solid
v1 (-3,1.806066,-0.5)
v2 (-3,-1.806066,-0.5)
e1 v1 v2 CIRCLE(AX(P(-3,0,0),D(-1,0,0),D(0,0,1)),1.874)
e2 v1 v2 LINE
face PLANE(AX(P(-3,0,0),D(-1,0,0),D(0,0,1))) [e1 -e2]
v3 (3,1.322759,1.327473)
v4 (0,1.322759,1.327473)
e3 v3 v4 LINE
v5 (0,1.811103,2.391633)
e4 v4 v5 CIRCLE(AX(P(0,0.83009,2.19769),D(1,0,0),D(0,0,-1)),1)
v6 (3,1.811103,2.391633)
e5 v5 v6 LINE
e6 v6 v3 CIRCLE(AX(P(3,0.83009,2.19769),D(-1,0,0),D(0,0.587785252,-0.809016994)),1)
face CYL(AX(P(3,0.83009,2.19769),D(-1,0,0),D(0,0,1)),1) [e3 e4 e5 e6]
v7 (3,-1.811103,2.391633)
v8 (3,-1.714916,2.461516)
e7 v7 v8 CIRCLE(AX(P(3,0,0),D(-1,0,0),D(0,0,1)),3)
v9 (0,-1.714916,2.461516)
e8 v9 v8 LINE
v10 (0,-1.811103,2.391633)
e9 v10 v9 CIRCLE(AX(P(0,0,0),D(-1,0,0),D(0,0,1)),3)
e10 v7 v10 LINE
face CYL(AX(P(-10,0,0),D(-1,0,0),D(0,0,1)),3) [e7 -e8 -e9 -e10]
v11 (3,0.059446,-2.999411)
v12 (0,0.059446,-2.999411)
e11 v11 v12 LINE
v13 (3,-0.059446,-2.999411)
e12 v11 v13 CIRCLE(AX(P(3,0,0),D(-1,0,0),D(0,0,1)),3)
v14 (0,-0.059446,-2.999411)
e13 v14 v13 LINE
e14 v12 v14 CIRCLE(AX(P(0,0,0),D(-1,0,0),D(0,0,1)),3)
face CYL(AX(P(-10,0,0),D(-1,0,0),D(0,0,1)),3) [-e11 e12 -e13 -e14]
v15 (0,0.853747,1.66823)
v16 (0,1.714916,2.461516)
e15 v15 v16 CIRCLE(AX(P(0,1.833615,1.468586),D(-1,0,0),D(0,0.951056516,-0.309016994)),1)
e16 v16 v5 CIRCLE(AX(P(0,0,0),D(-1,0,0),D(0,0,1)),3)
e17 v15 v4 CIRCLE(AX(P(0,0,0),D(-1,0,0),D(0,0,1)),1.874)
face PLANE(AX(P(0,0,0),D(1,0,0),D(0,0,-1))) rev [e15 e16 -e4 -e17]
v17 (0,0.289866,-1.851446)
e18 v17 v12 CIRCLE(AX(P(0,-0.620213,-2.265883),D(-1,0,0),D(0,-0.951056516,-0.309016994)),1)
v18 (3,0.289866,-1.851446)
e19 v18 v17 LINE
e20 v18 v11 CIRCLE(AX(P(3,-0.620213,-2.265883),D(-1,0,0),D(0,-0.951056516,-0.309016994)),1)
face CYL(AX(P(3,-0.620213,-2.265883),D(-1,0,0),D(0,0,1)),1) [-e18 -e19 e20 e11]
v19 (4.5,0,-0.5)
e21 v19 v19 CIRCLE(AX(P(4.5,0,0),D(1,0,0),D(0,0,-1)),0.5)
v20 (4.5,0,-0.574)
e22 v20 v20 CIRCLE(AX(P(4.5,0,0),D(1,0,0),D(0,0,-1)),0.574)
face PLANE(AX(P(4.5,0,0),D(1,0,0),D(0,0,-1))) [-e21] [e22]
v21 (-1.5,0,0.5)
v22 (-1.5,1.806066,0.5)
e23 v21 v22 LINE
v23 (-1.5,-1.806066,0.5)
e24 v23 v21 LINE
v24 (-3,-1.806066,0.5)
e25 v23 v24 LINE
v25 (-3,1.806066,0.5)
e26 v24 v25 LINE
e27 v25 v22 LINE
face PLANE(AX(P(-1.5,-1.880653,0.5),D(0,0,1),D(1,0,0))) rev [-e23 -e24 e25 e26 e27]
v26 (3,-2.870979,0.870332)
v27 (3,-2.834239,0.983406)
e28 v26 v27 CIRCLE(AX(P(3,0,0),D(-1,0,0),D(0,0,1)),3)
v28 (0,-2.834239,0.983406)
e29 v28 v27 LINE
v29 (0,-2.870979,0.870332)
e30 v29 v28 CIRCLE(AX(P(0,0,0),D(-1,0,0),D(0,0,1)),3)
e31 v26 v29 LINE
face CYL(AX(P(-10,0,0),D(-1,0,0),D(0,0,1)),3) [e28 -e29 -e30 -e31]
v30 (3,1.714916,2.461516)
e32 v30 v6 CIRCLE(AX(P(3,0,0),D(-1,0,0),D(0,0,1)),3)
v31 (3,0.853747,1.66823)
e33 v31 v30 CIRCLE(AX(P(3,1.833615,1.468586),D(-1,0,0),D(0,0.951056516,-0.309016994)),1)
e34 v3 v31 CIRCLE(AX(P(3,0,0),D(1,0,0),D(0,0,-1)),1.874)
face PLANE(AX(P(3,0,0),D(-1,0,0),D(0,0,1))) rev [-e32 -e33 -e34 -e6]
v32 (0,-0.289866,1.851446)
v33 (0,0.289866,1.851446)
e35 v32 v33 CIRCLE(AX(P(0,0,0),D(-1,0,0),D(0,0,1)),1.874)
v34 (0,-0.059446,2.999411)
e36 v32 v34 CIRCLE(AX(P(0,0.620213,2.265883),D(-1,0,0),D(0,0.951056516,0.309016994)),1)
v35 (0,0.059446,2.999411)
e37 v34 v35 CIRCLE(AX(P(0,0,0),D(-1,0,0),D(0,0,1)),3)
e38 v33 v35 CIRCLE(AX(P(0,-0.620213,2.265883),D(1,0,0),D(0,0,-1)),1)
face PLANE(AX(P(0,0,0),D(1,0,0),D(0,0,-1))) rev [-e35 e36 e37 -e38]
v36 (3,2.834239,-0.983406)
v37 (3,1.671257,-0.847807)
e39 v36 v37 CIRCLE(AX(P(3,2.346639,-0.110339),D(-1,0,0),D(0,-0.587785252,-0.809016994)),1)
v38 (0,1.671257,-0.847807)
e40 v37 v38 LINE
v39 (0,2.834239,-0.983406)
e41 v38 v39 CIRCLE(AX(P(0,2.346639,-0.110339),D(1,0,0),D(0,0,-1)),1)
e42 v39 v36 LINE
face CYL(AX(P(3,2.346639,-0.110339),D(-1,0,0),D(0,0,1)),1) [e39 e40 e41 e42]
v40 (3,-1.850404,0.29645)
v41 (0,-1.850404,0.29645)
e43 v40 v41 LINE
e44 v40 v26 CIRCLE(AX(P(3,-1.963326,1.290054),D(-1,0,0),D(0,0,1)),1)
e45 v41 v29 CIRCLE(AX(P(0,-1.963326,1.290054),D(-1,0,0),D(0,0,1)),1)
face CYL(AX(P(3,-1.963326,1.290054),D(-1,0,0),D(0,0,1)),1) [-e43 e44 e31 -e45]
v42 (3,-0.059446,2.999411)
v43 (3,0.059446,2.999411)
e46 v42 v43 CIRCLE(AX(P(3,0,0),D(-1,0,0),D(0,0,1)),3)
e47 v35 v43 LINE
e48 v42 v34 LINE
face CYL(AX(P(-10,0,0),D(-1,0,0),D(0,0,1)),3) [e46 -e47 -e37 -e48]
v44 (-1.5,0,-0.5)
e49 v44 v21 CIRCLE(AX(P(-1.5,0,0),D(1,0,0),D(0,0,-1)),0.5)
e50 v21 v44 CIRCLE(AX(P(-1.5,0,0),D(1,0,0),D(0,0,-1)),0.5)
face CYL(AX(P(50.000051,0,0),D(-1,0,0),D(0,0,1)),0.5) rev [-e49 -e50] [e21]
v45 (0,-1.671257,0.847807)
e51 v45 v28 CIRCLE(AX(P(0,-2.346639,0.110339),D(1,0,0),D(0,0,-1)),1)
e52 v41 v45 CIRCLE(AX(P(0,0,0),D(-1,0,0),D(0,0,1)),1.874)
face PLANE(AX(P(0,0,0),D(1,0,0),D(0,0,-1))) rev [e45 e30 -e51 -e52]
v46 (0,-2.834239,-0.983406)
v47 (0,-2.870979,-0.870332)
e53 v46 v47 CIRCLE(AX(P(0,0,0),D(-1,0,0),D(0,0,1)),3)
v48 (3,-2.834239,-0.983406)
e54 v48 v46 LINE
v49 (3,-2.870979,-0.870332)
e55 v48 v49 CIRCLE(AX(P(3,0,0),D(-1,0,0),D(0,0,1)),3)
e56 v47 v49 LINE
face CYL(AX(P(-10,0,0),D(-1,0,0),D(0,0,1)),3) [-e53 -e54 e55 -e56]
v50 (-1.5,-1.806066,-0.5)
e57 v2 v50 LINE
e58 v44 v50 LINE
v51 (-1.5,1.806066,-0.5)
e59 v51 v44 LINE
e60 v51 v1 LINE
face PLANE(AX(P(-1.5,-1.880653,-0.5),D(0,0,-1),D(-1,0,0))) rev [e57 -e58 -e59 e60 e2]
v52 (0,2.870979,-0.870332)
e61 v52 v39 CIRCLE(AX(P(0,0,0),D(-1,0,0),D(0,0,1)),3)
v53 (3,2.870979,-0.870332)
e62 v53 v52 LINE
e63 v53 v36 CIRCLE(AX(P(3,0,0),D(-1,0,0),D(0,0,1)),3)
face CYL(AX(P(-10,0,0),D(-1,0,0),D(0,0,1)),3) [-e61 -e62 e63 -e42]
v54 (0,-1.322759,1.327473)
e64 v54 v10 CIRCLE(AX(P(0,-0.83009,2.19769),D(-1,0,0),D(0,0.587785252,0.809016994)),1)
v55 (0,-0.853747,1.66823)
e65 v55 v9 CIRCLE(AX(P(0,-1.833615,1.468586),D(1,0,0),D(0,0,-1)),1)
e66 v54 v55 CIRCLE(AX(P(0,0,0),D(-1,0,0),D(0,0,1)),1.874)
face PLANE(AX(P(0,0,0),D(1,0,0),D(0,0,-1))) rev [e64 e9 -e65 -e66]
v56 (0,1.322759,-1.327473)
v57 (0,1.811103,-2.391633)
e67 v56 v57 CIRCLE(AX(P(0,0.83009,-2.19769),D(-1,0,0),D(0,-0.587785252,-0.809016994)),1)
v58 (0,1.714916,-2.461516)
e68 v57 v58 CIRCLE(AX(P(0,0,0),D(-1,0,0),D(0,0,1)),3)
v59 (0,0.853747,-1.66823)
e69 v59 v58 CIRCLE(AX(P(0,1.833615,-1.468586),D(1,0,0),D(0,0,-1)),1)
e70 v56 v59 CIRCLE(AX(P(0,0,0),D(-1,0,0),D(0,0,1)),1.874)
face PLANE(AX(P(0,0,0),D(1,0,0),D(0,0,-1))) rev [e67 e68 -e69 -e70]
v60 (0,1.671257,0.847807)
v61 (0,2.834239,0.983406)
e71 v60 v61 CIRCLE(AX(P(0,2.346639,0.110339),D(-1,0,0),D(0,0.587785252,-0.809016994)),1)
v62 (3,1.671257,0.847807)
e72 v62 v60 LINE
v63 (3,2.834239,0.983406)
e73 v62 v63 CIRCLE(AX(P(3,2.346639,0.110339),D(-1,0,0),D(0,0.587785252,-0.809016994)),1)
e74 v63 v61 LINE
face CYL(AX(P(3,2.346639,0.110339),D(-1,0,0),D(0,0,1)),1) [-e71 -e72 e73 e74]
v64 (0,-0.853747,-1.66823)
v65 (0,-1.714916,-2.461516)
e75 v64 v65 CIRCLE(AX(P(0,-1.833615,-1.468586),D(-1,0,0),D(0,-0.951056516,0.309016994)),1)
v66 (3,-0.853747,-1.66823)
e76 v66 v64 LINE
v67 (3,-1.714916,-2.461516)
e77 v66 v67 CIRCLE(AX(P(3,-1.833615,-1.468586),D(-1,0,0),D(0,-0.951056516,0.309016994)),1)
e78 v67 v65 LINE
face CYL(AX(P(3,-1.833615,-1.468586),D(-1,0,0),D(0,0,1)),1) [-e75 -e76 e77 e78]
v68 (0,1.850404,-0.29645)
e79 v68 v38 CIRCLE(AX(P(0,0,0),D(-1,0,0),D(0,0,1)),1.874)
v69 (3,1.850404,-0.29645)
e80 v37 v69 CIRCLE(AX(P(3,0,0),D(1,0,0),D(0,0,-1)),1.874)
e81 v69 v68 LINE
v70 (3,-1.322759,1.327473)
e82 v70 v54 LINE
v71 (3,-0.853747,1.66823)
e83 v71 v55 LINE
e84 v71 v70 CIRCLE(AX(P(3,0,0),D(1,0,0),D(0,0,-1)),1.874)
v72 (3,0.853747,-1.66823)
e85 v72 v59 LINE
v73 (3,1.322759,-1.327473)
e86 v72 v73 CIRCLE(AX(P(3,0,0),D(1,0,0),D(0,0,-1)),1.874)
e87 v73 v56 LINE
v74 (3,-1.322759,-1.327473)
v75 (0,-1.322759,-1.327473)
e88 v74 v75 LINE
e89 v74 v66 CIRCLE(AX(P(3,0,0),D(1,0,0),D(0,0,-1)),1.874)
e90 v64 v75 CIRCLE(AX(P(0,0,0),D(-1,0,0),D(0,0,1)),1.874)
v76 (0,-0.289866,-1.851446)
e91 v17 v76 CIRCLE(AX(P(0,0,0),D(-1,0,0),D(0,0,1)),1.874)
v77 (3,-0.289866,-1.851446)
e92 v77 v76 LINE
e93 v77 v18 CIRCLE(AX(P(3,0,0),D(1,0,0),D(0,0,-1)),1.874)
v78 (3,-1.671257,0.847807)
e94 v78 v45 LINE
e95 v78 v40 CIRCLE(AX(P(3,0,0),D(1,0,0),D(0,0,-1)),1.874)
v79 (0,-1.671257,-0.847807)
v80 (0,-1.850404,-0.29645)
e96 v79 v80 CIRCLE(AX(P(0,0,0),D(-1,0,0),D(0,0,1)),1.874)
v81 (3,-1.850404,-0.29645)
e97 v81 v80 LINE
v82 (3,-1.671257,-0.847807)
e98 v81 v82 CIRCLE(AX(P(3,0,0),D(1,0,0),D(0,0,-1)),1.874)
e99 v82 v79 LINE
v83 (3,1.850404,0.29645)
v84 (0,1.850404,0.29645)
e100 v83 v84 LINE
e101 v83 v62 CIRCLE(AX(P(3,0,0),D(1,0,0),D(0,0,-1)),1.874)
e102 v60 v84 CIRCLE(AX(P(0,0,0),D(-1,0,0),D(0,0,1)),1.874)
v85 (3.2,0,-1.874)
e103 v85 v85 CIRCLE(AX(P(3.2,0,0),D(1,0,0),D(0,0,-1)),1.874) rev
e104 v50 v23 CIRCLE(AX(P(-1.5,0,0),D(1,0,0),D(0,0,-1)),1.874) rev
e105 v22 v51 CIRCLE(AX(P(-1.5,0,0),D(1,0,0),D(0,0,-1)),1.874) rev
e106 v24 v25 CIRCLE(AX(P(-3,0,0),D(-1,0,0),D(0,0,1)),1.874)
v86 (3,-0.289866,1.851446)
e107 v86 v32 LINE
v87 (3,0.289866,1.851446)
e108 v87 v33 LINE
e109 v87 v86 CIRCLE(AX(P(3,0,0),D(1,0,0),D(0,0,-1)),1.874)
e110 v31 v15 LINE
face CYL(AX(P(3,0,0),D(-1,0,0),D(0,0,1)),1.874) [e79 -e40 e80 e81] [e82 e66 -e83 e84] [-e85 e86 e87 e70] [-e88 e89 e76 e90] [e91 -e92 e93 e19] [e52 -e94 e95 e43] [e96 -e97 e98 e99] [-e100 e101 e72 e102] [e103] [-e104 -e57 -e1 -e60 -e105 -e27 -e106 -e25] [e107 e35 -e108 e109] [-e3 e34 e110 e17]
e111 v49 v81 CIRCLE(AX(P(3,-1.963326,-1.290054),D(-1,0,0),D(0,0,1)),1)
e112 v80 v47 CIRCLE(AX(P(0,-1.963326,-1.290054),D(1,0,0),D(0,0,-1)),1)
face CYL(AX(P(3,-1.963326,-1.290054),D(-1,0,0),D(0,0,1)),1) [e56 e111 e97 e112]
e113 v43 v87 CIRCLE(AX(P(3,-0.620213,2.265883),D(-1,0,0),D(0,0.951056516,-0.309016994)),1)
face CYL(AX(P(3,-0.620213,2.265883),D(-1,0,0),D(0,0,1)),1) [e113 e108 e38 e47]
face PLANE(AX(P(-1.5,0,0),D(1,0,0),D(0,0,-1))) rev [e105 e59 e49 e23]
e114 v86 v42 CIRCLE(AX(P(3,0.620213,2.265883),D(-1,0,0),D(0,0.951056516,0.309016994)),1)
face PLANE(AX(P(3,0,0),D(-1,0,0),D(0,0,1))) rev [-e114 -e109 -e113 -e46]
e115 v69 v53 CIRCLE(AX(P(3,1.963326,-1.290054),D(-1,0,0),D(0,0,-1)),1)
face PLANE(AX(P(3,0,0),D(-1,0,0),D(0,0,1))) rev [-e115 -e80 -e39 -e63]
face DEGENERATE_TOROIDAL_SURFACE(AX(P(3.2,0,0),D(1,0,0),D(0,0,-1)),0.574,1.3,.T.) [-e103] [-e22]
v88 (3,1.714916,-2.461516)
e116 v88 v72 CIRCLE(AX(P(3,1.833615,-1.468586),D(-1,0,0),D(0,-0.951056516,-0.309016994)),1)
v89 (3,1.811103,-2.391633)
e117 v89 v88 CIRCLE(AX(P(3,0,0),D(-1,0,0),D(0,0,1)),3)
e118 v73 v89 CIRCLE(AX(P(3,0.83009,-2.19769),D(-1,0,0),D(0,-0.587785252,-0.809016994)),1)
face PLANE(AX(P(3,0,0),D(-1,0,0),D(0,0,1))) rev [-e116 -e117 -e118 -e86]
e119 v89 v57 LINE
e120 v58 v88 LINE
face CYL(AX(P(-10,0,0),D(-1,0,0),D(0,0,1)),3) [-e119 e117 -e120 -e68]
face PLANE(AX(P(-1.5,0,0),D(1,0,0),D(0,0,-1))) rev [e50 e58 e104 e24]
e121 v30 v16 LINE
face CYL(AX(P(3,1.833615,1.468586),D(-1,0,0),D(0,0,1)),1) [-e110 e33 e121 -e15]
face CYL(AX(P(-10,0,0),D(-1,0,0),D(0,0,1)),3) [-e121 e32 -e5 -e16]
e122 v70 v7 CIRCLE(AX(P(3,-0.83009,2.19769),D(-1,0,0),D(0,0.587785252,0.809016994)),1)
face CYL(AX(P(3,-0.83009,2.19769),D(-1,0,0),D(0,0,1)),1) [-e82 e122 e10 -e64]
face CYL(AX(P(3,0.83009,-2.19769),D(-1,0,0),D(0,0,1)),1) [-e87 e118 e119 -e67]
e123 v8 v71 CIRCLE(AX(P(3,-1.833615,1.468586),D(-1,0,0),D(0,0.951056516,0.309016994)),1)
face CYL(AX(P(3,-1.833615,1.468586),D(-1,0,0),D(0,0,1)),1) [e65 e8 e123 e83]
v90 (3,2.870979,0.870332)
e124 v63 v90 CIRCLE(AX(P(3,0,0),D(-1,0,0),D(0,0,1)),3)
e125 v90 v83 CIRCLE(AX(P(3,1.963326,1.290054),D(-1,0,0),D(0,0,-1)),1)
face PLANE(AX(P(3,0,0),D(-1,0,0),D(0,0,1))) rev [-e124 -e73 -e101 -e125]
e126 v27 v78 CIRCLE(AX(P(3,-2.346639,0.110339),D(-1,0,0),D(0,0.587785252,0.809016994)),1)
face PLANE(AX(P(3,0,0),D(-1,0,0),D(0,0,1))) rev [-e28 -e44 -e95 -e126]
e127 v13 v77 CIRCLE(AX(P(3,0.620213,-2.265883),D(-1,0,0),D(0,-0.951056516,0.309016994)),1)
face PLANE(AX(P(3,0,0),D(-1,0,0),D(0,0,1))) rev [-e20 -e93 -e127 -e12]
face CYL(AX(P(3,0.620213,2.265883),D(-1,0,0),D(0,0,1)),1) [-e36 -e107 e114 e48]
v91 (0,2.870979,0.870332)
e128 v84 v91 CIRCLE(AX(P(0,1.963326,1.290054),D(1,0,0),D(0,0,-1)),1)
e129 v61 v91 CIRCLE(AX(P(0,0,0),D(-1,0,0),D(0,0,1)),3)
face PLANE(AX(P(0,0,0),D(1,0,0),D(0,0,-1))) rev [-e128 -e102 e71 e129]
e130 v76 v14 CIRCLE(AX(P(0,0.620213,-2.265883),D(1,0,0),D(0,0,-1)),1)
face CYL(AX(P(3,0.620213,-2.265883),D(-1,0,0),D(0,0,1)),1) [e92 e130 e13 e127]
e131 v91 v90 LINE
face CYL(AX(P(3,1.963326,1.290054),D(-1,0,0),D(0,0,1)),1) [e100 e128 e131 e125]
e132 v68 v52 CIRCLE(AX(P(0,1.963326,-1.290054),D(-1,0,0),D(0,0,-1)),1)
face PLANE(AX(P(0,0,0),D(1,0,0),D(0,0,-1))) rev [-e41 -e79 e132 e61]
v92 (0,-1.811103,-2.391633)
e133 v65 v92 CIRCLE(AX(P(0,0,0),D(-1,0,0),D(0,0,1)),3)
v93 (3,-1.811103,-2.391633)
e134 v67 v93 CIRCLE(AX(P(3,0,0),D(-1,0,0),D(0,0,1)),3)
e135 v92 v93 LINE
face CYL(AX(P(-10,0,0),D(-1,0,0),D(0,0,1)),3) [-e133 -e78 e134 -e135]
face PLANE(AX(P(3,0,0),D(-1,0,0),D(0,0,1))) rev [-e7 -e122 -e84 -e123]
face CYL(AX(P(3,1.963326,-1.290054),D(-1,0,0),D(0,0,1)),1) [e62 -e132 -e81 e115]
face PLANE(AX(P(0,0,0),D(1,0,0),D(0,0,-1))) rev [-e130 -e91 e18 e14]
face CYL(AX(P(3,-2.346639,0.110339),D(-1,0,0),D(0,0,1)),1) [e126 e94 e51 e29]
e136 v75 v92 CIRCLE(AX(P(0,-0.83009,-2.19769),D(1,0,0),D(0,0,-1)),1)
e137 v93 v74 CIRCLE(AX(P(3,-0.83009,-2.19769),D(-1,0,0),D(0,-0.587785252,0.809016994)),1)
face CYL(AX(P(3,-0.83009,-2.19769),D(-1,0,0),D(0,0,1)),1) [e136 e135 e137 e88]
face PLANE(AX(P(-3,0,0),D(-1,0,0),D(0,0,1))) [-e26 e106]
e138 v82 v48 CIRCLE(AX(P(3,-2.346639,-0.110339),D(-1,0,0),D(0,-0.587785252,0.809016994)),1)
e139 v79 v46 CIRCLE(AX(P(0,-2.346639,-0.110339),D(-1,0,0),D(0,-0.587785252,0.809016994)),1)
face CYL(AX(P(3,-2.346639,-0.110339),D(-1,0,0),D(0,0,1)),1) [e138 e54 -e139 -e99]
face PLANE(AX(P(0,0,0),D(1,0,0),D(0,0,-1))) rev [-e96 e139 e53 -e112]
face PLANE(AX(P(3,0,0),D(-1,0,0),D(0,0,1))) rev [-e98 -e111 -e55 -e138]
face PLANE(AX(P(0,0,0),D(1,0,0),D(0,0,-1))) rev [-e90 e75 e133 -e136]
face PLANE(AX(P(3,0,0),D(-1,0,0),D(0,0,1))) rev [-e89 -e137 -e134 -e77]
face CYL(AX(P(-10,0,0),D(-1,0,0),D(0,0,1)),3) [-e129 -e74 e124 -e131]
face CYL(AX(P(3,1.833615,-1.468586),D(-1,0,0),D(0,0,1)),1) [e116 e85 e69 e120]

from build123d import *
from build123d.topology import SkipClean

# Parameters (mm, degrees)
BASPROSKE_W         = 3
BASPROSKE_H         = 3
TOOTHCUT_DEPTH      = 6.196152423
TEETHCUTS_COUNT     = 10
TEETHCUTS_ANGLE     = 324
BORSKE_R            = 0.5
BORE_DEPTH          = 50.0000508
SKETCH_1_R          = 1.874
SKETCH_1_R_2        = 0.5
EXTRUDE_1_DEPTH     = 1.5
FILLET_2_R          = 1.3
EXTRUDE_START       = 3
SKETCH_2_R          = 1.874
SKETCH_2_R_2        = 0.5
EXTRUDE_2_DEPTH     = 3
SKETCH_3_W          = 1
SKETCH_3_H          = 3.761306816
CUT_EXTRUDE_1_DEPTH = 1.5


with BuildPart() as part:
    # BasProSke → Base-Revolve (revolve)
    with BuildSketch(Plane(origin=(0, 0, 0), x_dir=(1, 0, 0), z_dir=(0, 1, 0)), mode=Mode.PRIVATE) as base_revolve_sk:
        with Locations((1.5, 1.5)):
            Rectangle(BASPROSKE_W, BASPROSKE_H)
    revolve(base_revolve_sk.sketch.rotate(Axis((-10, 0, 0), (1, 0, 0)), 180), axis=Axis((-10, 0, 0), (1, 0, 0)))

    # TooCutSke → ToothCut (cut, through all)
    with BuildSketch(Plane(origin=(0, 0, 0), x_dir=(0, 0, -1), z_dir=(1, 0, 0))):
        with BuildLine():
            ThreePointArc((0.296449938, 1.850403587), (0, 1.874), (-0.296449938, 1.850403587))
            ThreePointArc((-0.296449938, 1.850403587), (-0.428089565, 2.470295585), (-0.905889751, 2.886591228))
            ThreePointArc((-0.905889751, 2.886591228), (0, 3.0254), (0.905889751, 2.886591228))
            ThreePointArc((0.905889751, 2.886591228), (0.428089565, 2.470295585), (0.296449938, 1.850403587))
        make_face()
    toothcut = extrude(amount=TOOTHCUT_DEPTH, mode=Mode.SUBTRACT)

    # TeethCuts: ToothCut ×10 about axis
    teethcuts_axis = Axis((-10, 0, 0), (1, 0, 0))
    for i in range(1, TEETHCUTS_COUNT):
        add(toothcut.rotate(teethcuts_axis, i * TEETHCUTS_ANGLE / (TEETHCUTS_COUNT - 1)), mode=Mode.SUBTRACT)

    # BorSke → Bore (cut, symmetric)
    with BuildSketch(Plane(origin=(0, 0, 0), x_dir=(0, 0, -1), z_dir=(1, 0, 0))):
        with Locations(Location((0, 0, 0), (0, 0, 180))):
            Circle(BORSKE_R)
    extrude(amount=BORE_DEPTH, both=True, mode=Mode.SUBTRACT)

    # 草图1 → 凸台-拉伸1 (add)
    with SkipClean():  # the faces are left unmerged after this step: merging them gives an invalid solid
        with BuildSketch(Plane(origin=(3, 0, 0), x_dir=(0, 0, -1), z_dir=(1, 0, 0))):
            with Locations(Location((0, 0, 0), (0, 0, 171.101911086))):
                Circle(SKETCH_1_R)
            Circle(SKETCH_1_R_2, mode=Mode.SUBTRACT)
        extrude(amount=EXTRUDE_1_DEPTH)
    add(part.part.scale(1), mode=Mode.REPLACE)  # the faces are merged on a copy

    # 圆角2
    fillet_2_edges = [part.edges().sort_by_distance(p)[0] for p in [
        (4.5, -0.28986551, -1.851446458),
    ]]
    fillet(fillet_2_edges, radius=FILLET_2_R)

    # 草图2 → 凸台-拉伸2 (add)
    with BuildSketch(Plane.ZY.offset(EXTRUDE_START)):
        Circle(SKETCH_2_R)
        Circle(SKETCH_2_R_2, mode=Mode.SUBTRACT)
    extrude(amount=-EXTRUDE_2_DEPTH)

    # 草图3 → 切除-拉伸1 (cut)
    with BuildSketch(Plane.ZY.offset(3)):
        Rectangle(SKETCH_3_W, SKETCH_3_H)
    extrude(amount=-CUT_EXTRUDE_1_DEPTH, mode=Mode.SUBTRACT)


solid = part.part
